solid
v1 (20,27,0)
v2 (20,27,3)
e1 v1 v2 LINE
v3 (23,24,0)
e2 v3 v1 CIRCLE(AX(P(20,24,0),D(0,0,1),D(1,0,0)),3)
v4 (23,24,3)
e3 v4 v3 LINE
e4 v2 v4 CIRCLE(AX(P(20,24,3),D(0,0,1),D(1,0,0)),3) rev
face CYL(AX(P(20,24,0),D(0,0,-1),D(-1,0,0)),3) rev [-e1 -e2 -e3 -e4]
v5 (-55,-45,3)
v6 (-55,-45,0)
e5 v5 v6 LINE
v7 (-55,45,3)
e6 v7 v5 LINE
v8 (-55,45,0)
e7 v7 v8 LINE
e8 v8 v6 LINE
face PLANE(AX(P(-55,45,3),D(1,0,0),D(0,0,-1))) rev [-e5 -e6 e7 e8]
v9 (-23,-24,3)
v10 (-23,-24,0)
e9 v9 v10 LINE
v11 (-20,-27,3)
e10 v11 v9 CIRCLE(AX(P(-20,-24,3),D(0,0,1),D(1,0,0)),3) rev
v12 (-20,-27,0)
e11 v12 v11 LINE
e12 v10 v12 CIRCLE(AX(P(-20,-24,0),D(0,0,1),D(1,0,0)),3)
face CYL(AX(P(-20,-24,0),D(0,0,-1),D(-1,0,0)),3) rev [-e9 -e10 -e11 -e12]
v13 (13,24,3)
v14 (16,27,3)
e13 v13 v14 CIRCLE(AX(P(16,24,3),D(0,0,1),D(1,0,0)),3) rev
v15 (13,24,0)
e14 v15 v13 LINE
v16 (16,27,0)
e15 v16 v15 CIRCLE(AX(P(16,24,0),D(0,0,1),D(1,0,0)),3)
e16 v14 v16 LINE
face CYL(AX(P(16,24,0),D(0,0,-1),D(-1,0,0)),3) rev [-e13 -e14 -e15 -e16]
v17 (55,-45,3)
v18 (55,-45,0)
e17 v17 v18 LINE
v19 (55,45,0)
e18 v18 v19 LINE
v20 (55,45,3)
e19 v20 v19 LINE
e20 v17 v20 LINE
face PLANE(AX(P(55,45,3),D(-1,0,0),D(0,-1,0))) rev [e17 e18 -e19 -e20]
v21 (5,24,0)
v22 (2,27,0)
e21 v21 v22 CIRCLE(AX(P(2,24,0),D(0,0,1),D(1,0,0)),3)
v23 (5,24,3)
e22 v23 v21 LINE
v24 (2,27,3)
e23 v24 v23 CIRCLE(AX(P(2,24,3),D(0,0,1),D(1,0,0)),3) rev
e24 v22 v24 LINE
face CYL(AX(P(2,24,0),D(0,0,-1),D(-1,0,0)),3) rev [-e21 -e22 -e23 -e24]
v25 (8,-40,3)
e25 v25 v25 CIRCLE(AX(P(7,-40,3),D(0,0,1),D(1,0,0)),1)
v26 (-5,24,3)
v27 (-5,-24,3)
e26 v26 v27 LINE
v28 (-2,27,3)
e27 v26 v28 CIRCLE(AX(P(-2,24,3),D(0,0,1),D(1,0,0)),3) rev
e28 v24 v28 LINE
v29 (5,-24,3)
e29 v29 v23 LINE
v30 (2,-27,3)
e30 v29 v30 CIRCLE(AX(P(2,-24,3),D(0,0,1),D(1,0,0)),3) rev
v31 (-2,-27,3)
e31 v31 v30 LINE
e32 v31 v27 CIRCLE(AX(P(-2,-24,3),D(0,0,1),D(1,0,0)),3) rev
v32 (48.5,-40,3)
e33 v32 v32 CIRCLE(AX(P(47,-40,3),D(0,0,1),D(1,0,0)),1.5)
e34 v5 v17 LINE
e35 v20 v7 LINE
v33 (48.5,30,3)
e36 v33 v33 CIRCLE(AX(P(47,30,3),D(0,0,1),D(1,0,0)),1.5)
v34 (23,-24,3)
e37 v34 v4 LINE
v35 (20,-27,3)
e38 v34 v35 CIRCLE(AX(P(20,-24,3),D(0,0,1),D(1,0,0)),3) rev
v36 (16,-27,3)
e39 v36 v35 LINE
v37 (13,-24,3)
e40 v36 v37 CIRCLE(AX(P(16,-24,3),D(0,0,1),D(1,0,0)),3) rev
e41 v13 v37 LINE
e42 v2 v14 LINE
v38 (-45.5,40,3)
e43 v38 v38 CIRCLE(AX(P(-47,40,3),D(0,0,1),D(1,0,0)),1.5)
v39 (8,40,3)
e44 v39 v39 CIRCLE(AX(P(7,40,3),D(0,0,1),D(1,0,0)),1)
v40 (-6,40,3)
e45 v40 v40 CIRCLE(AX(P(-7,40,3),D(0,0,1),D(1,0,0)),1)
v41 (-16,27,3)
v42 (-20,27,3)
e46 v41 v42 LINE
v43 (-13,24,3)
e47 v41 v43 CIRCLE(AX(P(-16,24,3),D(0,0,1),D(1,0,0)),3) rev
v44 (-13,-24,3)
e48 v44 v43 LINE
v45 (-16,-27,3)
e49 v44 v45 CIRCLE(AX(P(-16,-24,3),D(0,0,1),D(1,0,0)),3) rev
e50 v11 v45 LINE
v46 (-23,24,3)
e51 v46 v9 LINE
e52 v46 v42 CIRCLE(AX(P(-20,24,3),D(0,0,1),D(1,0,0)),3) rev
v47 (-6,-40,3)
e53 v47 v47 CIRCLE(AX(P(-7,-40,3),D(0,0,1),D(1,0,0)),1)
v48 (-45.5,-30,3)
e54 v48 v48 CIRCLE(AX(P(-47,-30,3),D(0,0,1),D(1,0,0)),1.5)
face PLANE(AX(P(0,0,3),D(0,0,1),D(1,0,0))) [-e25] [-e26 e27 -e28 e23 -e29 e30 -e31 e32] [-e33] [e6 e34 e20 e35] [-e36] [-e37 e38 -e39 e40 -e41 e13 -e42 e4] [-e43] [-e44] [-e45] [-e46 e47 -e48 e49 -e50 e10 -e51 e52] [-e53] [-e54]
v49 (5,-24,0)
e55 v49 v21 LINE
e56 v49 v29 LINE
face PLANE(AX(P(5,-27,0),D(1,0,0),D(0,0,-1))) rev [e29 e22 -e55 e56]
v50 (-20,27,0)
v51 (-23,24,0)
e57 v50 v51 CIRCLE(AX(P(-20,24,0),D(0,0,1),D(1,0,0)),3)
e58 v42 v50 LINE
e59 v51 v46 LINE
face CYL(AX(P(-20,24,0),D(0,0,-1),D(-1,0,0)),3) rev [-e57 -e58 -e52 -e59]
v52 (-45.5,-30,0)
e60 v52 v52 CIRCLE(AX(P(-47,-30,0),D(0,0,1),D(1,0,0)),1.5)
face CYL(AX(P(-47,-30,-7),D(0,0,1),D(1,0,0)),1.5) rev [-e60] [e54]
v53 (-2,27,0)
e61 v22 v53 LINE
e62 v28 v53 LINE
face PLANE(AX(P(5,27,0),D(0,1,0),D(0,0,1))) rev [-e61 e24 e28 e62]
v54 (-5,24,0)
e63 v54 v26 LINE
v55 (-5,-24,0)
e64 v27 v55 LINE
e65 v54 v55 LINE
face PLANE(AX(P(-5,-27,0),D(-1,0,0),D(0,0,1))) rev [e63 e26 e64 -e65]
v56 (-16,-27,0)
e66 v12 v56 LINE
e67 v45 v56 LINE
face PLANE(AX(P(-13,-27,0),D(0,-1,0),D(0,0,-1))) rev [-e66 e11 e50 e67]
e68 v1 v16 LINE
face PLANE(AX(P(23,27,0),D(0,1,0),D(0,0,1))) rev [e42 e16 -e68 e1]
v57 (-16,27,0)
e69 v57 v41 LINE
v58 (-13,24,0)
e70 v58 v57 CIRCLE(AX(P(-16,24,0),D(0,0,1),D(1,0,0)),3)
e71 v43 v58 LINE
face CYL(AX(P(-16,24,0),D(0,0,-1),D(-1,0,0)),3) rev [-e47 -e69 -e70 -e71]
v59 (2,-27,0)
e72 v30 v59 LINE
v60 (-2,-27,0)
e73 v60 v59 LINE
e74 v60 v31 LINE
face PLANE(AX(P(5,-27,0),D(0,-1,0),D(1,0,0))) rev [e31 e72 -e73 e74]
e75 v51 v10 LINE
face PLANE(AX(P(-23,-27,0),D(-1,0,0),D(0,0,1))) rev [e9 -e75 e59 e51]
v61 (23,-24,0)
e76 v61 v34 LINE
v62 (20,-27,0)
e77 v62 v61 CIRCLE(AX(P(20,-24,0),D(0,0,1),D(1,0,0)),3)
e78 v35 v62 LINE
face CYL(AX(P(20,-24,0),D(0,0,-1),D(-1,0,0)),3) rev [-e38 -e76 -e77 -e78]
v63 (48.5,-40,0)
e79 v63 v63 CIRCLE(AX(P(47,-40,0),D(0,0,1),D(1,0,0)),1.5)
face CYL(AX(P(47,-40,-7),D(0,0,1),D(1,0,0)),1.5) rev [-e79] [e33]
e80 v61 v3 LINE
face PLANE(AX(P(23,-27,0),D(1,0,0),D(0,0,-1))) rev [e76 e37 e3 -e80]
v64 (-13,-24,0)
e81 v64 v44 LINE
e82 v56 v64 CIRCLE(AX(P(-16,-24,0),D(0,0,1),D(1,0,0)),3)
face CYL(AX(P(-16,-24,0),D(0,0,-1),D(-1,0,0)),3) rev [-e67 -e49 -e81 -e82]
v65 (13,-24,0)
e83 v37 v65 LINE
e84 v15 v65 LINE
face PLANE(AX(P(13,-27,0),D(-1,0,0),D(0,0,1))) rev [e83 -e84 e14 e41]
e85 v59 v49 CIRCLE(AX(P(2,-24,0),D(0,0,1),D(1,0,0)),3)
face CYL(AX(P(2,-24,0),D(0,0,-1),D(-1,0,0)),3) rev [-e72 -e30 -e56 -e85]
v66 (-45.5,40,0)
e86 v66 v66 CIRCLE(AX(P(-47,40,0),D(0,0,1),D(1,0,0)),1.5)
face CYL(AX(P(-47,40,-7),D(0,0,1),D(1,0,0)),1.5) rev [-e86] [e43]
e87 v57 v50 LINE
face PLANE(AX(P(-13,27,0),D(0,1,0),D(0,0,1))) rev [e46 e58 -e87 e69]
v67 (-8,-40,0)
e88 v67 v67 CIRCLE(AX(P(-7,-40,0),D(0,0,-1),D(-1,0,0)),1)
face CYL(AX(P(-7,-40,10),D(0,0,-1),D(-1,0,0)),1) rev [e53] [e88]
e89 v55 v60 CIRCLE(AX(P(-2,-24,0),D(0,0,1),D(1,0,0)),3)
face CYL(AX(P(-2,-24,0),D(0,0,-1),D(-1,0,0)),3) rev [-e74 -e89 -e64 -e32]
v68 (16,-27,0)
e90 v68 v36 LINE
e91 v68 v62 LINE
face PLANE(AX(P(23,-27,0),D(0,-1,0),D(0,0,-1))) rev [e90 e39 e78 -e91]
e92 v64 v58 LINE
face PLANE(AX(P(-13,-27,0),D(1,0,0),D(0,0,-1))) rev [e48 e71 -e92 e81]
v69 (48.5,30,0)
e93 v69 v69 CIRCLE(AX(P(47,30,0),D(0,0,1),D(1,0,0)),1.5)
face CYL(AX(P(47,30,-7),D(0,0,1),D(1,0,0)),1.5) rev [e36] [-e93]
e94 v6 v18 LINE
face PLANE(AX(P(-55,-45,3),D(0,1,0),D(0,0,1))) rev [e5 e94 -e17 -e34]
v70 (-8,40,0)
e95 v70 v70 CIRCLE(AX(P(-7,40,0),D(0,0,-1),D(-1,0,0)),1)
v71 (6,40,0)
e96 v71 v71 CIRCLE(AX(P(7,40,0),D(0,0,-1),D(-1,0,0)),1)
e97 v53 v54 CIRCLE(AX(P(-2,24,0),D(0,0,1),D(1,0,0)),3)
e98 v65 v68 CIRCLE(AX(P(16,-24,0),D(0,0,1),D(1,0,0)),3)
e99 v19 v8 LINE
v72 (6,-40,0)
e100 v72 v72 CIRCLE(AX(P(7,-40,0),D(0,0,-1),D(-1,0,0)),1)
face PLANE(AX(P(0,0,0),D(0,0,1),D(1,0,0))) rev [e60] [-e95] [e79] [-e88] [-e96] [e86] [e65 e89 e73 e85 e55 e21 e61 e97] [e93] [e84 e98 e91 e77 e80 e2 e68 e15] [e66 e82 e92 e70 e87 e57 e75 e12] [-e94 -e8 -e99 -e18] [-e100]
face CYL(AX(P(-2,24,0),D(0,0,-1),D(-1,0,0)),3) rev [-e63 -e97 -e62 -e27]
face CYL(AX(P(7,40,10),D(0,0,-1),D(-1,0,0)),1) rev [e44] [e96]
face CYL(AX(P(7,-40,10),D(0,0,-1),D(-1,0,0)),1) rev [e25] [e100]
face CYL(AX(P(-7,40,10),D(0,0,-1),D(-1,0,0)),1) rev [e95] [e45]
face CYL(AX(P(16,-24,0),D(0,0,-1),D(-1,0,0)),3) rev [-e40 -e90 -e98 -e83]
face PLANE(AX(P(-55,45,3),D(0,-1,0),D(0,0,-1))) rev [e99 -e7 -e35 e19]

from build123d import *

# Parameters (mm, degrees)
EXTRUDE_1_OUTLINE_W = 110
EXTRUDE_1_OUTLINE_H = 90
EXTRUDE_1_DEPTH     = 3
SKETCH_2_R          = 1.5
CUT_EXTRUDE_1_DEPTH = 10
SKETCH_4_R          = 1
CUT_EXTRUDE_2_DEPTH = 10
SKETCH_5_W          = 10
SKETCH_5_H          = 54
CUT_EXTRUDE_3_DEPTH = 72.126647608
FILLET_1_R          = 3


# Read off the part's stored shape, not the designer's step: 凸台-拉伸1
with BuildPart() as part:
    # 凸台-拉伸1 outline → 凸台-拉伸1 (new body)
    with BuildSketch(Plane.XY):
        Rectangle(EXTRUDE_1_OUTLINE_W, EXTRUDE_1_OUTLINE_H)
    extrude(amount=EXTRUDE_1_DEPTH)

    # 草图2 → 切除-拉伸1 (cut)
    with BuildSketch(Plane.XY.offset(3)):
        with Locations((-47, 40)):
            Circle(SKETCH_2_R)
        with Locations((47, 30)):
            Circle(SKETCH_2_R)
        with Locations((47, -40)):
            Circle(SKETCH_2_R)
        with Locations((-47, -30)):
            Circle(SKETCH_2_R)
    extrude(amount=-CUT_EXTRUDE_1_DEPTH, mode=Mode.SUBTRACT)

    # 草图4 → 切除-拉伸2 (cut)
    with BuildSketch(Plane(origin=(0, 0, 0), x_dir=(-1, 0, 0), z_dir=(0, 0, -1))):
        with Locations((-7, 40)):
            Circle(SKETCH_4_R)
        with Locations((7, 40)):
            Circle(SKETCH_4_R)
        with Locations((-7, -40)):
            Circle(SKETCH_4_R)
        with Locations((7, -40)):
            Circle(SKETCH_4_R)
    extrude(amount=-CUT_EXTRUDE_2_DEPTH, mode=Mode.SUBTRACT)

    # 草图5 → 切除-拉伸3 (cut, through all)
    with BuildSketch(Plane.XY.offset(3)):
        with Locations((-18, 0)):
            Rectangle(SKETCH_5_W, SKETCH_5_H)
        Rectangle(SKETCH_5_W, SKETCH_5_H)
        with Locations((18, 0)):
            Rectangle(SKETCH_5_W, SKETCH_5_H)
    extrude(amount=-CUT_EXTRUDE_3_DEPTH, mode=Mode.SUBTRACT)

    # 圆角1
    fillet_1_edges = [part.edges().sort_by_distance(p)[0] for p in [
        (-23, -27, 1.5),
        (-23, 27, 1.5),
        (-13, 27, 1.5),
        (-13, -27, 1.5),
        (-5, -27, 1.5),
        (-5, 27, 1.5),
        (5, 27, 1.5),
        (5, -27, 1.5),
        (13, -27, 1.5),
        (13, 27, 1.5),
        (23, 27, 1.5),
        (23, -27, 1.5),
    ]]
    fillet(fillet_1_edges, radius=FILLET_1_R)


solid = part.part
